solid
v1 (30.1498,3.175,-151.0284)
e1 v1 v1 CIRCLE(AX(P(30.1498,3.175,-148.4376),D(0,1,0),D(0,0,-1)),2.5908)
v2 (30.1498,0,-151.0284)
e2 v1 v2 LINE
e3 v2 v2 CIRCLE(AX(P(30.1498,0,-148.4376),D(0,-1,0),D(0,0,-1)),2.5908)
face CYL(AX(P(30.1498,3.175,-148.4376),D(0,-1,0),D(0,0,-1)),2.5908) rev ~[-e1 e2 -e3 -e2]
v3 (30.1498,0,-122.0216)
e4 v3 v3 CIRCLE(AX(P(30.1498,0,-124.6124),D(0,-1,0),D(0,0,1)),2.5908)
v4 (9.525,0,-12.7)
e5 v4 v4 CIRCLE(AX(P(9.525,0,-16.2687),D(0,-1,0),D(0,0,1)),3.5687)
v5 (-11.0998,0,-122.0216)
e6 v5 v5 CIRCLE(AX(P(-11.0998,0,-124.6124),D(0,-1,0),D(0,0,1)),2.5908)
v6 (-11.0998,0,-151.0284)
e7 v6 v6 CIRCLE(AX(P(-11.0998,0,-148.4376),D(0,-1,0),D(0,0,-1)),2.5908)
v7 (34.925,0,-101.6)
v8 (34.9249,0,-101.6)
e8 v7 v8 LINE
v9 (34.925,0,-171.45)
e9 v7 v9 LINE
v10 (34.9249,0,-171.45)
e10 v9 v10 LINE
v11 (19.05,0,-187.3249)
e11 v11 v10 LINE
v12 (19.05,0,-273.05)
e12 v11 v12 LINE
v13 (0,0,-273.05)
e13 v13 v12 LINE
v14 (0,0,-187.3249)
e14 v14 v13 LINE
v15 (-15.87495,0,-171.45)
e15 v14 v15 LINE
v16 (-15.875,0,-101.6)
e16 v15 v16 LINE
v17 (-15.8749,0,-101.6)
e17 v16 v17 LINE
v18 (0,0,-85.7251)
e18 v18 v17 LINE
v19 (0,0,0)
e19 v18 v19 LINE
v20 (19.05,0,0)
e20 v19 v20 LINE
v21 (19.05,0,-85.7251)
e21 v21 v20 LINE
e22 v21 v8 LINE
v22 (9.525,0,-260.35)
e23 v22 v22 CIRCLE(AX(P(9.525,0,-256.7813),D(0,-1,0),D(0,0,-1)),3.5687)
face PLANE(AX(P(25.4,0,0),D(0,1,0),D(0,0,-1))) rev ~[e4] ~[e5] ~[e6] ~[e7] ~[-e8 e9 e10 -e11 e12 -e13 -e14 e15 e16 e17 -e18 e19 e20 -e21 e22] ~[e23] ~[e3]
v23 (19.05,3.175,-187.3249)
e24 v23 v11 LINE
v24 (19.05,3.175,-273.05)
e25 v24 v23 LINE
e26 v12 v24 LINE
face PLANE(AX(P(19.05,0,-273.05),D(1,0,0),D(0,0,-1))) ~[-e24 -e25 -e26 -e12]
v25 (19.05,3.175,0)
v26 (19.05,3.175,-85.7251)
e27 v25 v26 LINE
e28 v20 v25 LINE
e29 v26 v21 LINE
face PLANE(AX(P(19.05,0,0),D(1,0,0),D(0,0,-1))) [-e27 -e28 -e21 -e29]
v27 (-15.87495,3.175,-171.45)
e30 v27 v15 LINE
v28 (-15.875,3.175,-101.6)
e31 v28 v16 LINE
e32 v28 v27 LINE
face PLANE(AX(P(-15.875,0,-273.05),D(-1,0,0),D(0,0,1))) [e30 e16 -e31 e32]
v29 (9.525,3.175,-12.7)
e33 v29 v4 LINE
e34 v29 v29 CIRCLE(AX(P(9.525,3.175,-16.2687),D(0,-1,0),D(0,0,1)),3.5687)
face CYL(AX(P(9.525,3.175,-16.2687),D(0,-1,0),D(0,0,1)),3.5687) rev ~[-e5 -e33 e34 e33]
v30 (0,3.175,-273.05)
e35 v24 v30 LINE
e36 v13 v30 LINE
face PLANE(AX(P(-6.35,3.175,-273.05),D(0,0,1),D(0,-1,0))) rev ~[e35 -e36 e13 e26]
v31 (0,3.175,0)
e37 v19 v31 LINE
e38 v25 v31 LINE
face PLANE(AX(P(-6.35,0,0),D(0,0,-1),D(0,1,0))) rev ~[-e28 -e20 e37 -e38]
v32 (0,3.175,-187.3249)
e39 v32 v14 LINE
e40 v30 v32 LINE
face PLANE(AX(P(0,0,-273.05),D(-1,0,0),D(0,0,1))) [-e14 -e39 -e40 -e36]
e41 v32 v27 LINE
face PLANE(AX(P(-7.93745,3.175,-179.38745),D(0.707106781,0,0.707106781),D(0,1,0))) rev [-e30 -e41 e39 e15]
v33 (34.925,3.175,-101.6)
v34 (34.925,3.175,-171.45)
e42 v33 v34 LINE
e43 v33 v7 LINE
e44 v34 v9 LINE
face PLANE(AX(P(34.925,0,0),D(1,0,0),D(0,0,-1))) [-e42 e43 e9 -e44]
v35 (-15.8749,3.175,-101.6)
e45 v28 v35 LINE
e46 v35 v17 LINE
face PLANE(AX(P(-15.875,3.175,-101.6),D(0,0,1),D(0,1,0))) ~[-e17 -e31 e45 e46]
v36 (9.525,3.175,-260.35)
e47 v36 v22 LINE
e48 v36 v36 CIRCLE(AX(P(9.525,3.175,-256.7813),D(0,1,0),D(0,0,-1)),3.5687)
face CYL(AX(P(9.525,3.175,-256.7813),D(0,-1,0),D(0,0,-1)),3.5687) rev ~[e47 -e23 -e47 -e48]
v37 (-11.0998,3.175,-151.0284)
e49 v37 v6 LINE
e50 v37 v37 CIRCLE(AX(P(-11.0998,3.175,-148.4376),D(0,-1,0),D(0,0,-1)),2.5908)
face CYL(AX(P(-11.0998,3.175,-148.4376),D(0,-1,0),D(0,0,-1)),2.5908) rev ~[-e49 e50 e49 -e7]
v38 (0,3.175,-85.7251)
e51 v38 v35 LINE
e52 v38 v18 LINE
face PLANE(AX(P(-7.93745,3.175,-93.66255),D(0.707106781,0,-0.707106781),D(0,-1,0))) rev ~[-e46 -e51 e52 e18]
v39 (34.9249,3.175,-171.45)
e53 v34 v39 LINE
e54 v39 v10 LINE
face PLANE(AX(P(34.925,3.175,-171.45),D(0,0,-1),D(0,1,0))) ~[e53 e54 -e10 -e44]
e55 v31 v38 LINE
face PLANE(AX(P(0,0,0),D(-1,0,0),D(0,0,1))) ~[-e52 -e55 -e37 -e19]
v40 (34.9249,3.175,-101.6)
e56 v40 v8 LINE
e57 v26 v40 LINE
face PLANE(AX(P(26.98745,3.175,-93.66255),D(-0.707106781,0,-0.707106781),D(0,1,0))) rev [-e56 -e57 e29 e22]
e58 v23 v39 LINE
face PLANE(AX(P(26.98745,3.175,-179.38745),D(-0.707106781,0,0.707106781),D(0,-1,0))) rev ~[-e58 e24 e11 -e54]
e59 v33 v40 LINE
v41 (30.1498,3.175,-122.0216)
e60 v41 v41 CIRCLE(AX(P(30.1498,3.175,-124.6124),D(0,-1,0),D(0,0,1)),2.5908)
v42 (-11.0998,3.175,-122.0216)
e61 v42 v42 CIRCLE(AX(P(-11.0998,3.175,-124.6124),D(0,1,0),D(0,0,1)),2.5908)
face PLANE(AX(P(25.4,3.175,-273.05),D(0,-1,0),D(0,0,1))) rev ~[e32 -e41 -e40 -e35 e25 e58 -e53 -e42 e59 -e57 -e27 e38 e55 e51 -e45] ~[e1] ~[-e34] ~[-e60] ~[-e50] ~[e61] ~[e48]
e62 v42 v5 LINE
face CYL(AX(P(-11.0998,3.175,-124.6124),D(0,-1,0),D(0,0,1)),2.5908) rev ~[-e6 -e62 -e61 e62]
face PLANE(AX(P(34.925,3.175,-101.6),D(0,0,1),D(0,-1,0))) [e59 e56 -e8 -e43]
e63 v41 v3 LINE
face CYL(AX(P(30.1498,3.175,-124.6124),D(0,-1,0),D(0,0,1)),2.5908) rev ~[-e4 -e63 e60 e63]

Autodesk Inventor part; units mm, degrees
ref_plane "YZ Plane" through (0, 0, 0) normal (1, 0, 0) x (0, 1, 0)
ref_plane "XZ Plane" through (0, 0, 0) normal (0, 1, 0) x (-1, 0, 0)
ref_plane "XY Plane" through (0, 0, 0) normal (0, 0, 1) x (1, 0, 0)
sketch "Sketch1" plane through (0, 0, 0) normal (0, 1, 0) x (-1, 0, 0)
  line L0 (0, 0) -> (-19.05, 0)
  line L1 (-19.05, 0) -> (-19.05, -273.05)
  line L2 (-19.05, -273.05) -> (0, -273.05)
  line L3 (0, -273.05) -> (0, 0)
  dimension "d0" = 19.05
  dimension "d1" = 273.05
extrude "Extrusion1" add sketch "Sketch1" along normal blind 3.175
sketch "Sketch4" plane through (19.05, 0, 0) normal (1, 0, 0) x (0, 0, -1)
  line L0 (273.05, 0) -> (273.05, 3.175) projected
  line L1 (0, 3.175) -> (273.05, 3.175)
  line L2 (273.05, 3.175) -> (273.05, 0)
  line L3 (273.05, 0) -> (0, 0)
  line L4 (0, 0) -> (0, 3.175)
extrude "Extrusion2" add sketch "Sketch4" along normal blind 6.35
sketch "Sketch5" plane through (0, 0, -273.05) normal (-1, 0, 0) x (0, 0, 1)
  line L0 (0, 0) -> (0, 3.175) projected
  line L1 (0, 3.175) -> (273.05, 3.175)
  line L2 (273.05, 3.175) -> (273.05, 0)
  line L3 (273.05, 0) -> (0, 0)
  line L4 (0, 0) -> (0, 3.175)
extrude "Extrusion3" add sketch "Sketch5" along normal blind 6.35
ref_plane "Work Plane1" through (9.525, 0, 0) normal (1, 0, 0) x (0, 0, -1)
ref_plane "Work Plane2" through (25.4, 0, -136.525) normal (0, 0, 1) x (1, 0, 0)
sketch "Sketch6" plane through (25.4, 0, 0) normal (1, 0, 0) x (0, 0, -1)
  line L0 (0, 0) -> (273.05, 0) projected
  line L1 (0, 3.175) -> (273.05, 3.175)
  line L2 (273.05, 3.175) -> (273.05, 0)
  line L3 (273.05, 0) -> (0, 0)
  line L4 (0, 0) -> (0, 3.175)
extrude "Extrusion4" add sketch "Sketch6" along normal blind 9.525
sketch "Sketch7" plane through (-6.35, 0, -273.05) normal (-1, 0, 0) x (0, 0, 1)
  line L0 (273.05, 3.175) -> (0, 3.175) projected
  line L1 (0, 3.175) -> (0, 0) projected
  line L2 (273.05, 3.175) -> (0, 3.175)
  line L3 (0, 3.175) -> (0, 0)
  line L4 (0, 0) -> (273.05, 0)
  line L5 (273.05, 0) -> (273.05, 3.175)
extrude "Extrusion5" add sketch "Sketch7" along normal blind 9.525
sketch "Sketch8" plane through (0, 3.175, 0) normal (0, 1, 0) x (1, 0, 0)
  line L0 (34.925, 273.05) -> (34.925, 0) projected
  line L1 (34.925, 0) -> (-15.875, 0) projected
  point P0 (0, 0)
  point P1 (30.1498, 124.6124)
  dimension "d30" = 4.7752
  dimension "d31" = 124.6124
hole "Hole3" at (30.1498, 3.175, -124.6124) direction (0, -1, 0) diameter 5.1816 end through all
mirror "Mirror4" about plane through (9.525, 0, 0) normal (1, 0, 0) of "Hole3"
mirror "Mirror5" about plane through (25.4, 0, -136.525) normal (0, 0, 1) of "Hole3", "Mirror4"
sketch "Sketch10" plane through (34.925, 0, 0) normal (1, 0, 0) x (0, 0, -1)
  line L0 (0, 3.175) -> (101.6, 3.175)
  line L1 (101.6, 3.175) -> (101.6, 0)
  line L2 (101.6, 0) -> (0, 0)
  line L3 (0, 0) -> (0, 3.175)
  dimension "d40" = 101.6
  dimension "d41" = 3.175
extrude "Extrusion6" cut sketch "Sketch10" against normal blind 15.875
chamfer "Chamfer1" distance 15.875 angle 45 1 edges at (19.05, 1.5875, -101.6)
mirror "Mirror6" about plane through (9.525, 0, 0) normal (1, 0, 0) of "Extrusion6", "Chamfer1"
mirror "Mirror7" about plane through (25.4, 0, -136.525) normal (0, 0, 1) of "Extrusion6", "Chamfer1", "Mirror6"
sketch "Sketch11" plane through (0, 3.175, 0) normal (0, 1, 0) x (1, 0, 0)
  line L0 (19.05, 0) -> (0, 0) projected
  line L1 (0, 85.725) -> (0, 0) projected
  point P0 (9.525, 16.2687)
  dimension "d47" = 16.2687
  dimension "d48" = 9.525
hole "Hole4" at (9.525, 3.175, -16.2687) direction (0, -1, 0) diameter 7.1374 end through all
mirror "Mirror8" about plane through (25.4, 0, -136.525) normal (0, 0, 1) of "Hole4"
properties part number "top beam"
